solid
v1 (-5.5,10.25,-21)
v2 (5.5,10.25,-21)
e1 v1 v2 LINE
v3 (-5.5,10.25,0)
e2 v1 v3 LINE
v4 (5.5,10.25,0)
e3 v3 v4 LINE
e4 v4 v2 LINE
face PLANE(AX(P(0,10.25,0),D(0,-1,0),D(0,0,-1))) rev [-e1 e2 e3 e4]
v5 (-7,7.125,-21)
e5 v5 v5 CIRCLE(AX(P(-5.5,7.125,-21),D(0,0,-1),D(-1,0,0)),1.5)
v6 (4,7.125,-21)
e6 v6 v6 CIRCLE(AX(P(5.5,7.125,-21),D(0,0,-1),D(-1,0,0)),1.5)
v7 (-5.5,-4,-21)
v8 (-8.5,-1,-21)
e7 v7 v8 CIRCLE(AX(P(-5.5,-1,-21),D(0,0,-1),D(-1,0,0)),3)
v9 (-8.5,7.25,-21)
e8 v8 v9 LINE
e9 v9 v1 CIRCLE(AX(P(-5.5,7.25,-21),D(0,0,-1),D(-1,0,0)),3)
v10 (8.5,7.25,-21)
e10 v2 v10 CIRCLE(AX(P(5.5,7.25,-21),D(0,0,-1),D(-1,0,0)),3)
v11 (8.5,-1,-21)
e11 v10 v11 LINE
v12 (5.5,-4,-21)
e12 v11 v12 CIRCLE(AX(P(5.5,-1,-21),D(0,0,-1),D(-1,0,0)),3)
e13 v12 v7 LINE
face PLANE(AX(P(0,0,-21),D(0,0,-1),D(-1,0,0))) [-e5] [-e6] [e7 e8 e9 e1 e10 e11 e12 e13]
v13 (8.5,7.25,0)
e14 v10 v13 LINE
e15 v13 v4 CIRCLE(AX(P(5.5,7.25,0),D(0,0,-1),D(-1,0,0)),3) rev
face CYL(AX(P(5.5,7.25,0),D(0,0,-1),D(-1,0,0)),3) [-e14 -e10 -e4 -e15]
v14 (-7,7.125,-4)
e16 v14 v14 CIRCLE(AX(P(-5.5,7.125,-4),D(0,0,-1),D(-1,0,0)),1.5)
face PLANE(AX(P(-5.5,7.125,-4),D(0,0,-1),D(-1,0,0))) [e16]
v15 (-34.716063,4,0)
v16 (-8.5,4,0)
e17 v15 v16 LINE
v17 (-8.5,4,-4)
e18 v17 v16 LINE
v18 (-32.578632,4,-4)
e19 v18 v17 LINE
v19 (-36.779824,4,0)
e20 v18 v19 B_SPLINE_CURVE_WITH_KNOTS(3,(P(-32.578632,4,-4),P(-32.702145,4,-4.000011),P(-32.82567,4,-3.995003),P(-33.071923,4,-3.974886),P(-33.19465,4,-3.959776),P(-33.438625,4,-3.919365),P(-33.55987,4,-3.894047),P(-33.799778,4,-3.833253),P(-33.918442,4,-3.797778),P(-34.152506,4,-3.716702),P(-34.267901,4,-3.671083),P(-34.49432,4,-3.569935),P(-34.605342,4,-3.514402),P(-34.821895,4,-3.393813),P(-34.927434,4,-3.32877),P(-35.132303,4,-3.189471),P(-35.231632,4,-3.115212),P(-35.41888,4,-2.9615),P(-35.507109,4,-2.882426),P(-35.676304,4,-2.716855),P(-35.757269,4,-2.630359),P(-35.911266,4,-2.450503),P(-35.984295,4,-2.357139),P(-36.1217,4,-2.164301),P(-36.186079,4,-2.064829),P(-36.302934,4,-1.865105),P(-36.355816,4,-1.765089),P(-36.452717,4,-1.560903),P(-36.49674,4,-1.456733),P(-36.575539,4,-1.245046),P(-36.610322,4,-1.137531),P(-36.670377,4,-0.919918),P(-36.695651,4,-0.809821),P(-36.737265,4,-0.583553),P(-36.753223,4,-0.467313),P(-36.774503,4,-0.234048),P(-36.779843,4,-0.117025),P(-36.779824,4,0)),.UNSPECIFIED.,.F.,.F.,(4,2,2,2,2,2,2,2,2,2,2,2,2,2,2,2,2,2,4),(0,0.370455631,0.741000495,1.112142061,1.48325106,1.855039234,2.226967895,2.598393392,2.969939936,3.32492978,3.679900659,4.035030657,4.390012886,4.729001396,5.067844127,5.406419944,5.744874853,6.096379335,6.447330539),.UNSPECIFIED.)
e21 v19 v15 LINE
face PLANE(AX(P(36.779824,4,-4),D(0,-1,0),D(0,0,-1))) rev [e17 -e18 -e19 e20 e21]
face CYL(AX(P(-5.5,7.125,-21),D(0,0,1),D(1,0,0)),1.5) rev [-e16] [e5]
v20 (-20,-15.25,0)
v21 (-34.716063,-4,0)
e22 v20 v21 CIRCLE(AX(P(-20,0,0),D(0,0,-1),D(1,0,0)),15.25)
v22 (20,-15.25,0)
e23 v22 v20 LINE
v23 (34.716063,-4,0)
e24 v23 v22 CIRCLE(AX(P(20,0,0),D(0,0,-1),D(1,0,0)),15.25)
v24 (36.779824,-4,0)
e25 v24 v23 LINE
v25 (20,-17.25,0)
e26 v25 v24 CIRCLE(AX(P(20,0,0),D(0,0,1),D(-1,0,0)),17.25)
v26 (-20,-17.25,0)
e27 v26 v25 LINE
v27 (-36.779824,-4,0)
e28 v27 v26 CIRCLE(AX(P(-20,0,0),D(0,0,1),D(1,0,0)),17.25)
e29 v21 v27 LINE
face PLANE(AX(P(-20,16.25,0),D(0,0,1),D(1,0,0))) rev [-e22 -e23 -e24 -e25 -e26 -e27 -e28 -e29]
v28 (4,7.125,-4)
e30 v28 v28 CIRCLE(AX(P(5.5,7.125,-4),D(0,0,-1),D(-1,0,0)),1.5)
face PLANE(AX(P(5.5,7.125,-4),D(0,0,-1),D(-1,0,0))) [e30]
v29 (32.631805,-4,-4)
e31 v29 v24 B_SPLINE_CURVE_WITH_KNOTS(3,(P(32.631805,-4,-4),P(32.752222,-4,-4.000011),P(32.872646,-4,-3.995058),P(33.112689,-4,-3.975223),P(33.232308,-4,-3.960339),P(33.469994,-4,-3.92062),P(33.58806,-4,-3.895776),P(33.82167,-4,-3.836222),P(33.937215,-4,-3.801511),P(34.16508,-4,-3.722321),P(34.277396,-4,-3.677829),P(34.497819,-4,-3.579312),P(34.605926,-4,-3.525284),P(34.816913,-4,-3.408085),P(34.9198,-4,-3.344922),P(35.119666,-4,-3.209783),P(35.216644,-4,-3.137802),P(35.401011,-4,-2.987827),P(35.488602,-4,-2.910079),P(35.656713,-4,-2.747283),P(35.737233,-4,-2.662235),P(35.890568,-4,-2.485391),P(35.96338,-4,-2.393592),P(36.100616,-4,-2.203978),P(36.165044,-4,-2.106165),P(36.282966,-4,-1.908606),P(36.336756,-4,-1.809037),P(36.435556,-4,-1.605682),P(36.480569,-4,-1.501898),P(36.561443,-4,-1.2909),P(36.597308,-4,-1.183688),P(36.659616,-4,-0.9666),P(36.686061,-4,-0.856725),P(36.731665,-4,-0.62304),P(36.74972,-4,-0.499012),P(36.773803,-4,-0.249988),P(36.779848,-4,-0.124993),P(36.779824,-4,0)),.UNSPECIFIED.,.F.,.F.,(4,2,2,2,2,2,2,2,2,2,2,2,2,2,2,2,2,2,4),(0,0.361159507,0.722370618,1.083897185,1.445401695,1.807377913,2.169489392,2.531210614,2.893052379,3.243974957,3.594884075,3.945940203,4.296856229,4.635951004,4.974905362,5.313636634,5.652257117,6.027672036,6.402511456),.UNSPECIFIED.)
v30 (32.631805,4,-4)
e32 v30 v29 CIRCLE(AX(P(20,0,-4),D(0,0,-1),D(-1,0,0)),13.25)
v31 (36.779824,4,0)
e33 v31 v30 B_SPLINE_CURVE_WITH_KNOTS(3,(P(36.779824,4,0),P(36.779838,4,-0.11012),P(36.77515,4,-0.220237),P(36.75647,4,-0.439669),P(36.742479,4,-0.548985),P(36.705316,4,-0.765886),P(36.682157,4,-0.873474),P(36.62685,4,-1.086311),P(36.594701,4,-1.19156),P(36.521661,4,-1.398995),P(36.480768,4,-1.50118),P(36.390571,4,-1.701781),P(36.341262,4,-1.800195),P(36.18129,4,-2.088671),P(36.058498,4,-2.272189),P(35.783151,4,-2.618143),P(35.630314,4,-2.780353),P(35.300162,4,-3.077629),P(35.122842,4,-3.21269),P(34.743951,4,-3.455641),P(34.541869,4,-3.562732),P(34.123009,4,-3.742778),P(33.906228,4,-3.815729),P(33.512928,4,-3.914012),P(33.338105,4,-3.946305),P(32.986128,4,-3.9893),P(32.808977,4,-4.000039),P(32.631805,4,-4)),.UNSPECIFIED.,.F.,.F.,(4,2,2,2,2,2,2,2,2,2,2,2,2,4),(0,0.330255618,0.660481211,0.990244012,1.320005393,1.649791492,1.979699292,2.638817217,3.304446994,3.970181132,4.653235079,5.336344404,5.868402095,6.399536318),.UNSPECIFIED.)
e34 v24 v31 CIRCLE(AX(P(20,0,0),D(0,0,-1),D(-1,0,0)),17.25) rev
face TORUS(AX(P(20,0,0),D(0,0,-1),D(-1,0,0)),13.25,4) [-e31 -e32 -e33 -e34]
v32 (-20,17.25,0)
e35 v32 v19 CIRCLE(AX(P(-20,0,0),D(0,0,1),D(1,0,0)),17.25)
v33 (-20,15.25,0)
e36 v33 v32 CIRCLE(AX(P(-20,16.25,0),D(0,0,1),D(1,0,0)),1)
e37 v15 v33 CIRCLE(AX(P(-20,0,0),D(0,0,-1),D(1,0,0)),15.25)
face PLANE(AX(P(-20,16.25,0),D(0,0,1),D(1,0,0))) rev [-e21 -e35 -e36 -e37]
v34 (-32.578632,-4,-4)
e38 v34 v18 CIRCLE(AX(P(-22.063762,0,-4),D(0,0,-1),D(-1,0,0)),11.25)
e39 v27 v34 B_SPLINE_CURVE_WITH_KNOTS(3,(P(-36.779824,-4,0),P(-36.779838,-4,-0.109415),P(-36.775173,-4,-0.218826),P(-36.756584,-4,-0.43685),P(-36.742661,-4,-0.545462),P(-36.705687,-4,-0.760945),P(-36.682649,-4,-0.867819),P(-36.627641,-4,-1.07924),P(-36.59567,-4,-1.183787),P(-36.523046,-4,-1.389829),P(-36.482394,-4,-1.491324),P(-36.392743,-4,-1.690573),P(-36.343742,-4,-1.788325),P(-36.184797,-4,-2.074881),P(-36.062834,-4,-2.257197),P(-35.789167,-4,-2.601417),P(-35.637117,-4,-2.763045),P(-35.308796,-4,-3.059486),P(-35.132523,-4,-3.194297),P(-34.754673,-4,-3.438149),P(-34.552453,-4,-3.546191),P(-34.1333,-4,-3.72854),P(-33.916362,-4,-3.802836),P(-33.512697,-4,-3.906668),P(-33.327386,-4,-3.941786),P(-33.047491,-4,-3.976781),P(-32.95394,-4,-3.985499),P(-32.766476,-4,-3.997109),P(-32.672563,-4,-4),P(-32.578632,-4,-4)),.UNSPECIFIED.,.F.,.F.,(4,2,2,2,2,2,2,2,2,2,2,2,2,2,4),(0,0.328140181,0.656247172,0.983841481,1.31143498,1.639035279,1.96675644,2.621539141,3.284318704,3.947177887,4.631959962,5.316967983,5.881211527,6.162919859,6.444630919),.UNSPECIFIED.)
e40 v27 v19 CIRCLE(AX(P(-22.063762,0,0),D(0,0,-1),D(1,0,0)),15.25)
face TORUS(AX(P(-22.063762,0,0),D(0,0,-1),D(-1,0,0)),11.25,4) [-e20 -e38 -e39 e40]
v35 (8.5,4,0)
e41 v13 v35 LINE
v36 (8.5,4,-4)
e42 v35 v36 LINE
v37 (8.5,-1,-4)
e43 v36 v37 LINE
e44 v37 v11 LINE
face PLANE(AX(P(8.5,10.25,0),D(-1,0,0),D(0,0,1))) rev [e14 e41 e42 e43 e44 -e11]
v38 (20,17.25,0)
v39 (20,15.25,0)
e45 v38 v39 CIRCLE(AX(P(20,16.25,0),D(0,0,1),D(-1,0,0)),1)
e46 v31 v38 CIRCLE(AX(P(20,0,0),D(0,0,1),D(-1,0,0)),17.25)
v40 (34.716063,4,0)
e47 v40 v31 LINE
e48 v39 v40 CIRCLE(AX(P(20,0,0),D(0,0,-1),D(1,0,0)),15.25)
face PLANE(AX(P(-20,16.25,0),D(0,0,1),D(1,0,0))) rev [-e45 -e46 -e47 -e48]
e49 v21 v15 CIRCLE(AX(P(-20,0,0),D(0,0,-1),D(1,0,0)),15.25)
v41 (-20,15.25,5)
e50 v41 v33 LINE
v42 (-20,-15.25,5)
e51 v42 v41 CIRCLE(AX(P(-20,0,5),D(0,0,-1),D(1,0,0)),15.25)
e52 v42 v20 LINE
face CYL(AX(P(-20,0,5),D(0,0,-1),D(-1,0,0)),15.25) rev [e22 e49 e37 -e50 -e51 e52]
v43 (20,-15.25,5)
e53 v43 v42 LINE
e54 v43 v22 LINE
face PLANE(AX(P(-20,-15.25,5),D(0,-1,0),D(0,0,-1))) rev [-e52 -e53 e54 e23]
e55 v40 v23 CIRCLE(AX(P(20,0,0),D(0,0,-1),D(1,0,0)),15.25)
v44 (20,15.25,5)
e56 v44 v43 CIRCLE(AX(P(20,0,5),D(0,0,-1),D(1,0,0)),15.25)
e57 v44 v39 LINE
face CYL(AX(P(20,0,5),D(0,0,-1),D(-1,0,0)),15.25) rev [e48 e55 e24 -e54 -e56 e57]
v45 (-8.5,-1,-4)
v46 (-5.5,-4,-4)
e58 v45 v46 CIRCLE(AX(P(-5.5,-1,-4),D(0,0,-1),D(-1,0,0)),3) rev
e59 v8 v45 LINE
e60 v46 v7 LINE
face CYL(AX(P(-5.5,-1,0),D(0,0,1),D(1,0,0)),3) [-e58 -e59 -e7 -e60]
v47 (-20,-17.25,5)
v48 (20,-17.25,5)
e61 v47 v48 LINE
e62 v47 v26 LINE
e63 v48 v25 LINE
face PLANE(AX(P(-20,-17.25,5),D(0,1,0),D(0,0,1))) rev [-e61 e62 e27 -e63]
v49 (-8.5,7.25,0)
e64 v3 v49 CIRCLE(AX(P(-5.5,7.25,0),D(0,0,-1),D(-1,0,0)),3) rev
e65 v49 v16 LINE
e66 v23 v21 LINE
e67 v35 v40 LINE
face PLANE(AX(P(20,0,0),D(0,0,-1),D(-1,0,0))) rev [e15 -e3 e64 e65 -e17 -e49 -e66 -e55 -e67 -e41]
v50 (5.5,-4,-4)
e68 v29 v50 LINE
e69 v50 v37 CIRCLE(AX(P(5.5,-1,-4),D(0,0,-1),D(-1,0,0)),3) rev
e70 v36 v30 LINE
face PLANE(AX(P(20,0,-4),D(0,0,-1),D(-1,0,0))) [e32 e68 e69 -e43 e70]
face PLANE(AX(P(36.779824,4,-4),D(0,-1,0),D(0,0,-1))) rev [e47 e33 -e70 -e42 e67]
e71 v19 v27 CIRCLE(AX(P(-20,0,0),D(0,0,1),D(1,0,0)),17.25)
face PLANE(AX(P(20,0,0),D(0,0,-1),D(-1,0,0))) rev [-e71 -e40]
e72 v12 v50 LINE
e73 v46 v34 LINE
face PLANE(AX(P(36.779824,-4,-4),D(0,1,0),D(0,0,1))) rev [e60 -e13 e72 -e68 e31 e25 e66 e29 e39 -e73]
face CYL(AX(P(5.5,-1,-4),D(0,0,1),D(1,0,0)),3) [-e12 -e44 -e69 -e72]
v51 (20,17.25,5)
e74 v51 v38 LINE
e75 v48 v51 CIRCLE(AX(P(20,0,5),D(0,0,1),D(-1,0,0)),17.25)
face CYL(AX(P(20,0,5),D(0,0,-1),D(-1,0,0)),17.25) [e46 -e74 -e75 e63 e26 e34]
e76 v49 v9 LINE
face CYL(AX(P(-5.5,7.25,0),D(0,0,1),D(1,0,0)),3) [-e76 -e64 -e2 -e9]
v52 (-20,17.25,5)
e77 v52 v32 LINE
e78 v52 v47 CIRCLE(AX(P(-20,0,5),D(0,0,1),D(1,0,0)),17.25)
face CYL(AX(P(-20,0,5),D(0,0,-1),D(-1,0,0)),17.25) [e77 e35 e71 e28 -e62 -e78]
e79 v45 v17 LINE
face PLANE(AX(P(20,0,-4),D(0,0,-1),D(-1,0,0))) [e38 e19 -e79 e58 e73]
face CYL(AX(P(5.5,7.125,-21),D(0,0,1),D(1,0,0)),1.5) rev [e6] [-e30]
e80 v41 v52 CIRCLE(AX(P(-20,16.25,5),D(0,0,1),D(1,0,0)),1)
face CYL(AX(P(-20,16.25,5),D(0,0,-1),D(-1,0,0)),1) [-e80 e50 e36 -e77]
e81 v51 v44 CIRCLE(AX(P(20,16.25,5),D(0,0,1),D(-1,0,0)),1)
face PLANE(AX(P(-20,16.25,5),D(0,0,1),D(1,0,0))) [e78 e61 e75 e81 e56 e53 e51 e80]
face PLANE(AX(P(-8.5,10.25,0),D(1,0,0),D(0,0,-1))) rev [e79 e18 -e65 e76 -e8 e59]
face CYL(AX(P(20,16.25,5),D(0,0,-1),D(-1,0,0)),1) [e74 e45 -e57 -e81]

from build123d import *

# Parameters (mm, degrees)
BOSS_EXTRUDE1_DEPTH = 5
BOSS_EXTRUDE2_START = 4
BOSS_EXTRUDE2_DEPTH = 4
FILLET1_R           = 4
SKETCH5_W           = 17
SKETCH5_H           = 4
BOSS_EXTRUDE3_DEPTH = 6.25
SKETCH8_W           = 17
SKETCH8_H           = 14.25
BOSS_EXTRUDE4_DEPTH = 17
SKETCH6_R           = 1.5
CUT_EXTRUDE1_DEPTH  = 45.484596337
FILLET3_R           = 3


with BuildPart() as part:
    # Sketch3 → Boss-Extrude1 (new body)
    with BuildSketch(Plane.XY):
        with BuildLine():
            Line((-20, -17.25), (20, -17.25))
            ThreePointArc((20, -17.25), (37.25, 0), (20, 17.25))
            ThreePointArc((20, 17.25), (19, 16.25), (20, 15.25))
            ThreePointArc((20, 15.25), (35.25, 0), (20, -15.25))
            Line((20, -15.25), (-20, -15.25))
            ThreePointArc((-20, -15.25), (-35.25, 0), (-20, 15.25))
            ThreePointArc((-20, 15.25), (-19, 16.25), (-20, 17.25))
            ThreePointArc((-20, 17.25), (-37.25, 0), (-20, -17.25))
        make_face()
    extrude(amount=BOSS_EXTRUDE1_DEPTH)

    # Sketch4 → Boss-Extrude2 (add)
    with BuildSketch(Plane(origin=(0, 0, 0), x_dir=(-1, 0, 0), z_dir=(0, 0, -1)).offset(BOSS_EXTRUDE2_START)):
        with BuildLine():
            Line((-36.779824195, 4), (36.779824195, 4))
            ThreePointArc((36.779824195, 4), (37.313761542, 0), (36.779824195, -4))
            Line((36.779824195, -4), (-36.779824195, -4))
            ThreePointArc((-36.779824195, -4), (-37.25, 0), (-36.779824195, 4))
        make_face()
    extrude(amount=-BOSS_EXTRUDE2_DEPTH)

    # Fillet1
    fillet1_edges = [part.edges().sort_by_distance(p)[0] for p in [
        (-37.313761542, 0, -4),
        (37.25, 0, -4),
    ]]
    fillet(fillet1_edges, radius=FILLET1_R - 0.0001)  # a hair under: the kernel refuses the full size

    # Sketch5 → Boss-Extrude3 (add)
    with BuildSketch(Plane(origin=(0, 4, 0), x_dir=(1, 0, 0), z_dir=(0, 1, 0))):
        with Locations((0, 2)):
            Rectangle(SKETCH5_W, SKETCH5_H)
    extrude(amount=BOSS_EXTRUDE3_DEPTH)

    # Sketch8 → Boss-Extrude4 (add)
    with BuildSketch(Plane(origin=(0, 0, -4), x_dir=(-1, 0, 0), z_dir=(0, 0, -1))):
        with Locations((0, 3.125)):
            Rectangle(SKETCH8_W, SKETCH8_H)
    extrude(amount=BOSS_EXTRUDE4_DEPTH)

    # Sketch6 → Cut-Extrude1 (cut, through all)
    with BuildSketch(Plane(origin=(0, 0, -4), x_dir=(-1, 0, 0), z_dir=(0, 0, -1))):
        with Locations((-5.5, 7.125)):
            Circle(SKETCH6_R)
        with Locations((5.5, 7.125)):
            Circle(SKETCH6_R)
    extrude(amount=CUT_EXTRUDE1_DEPTH, mode=Mode.SUBTRACT)

    # Fillet3
    fillet3_edges = [part.edges().sort_by_distance(p)[0] for p in [
        (-8.5, 10.25, -10.5),
        (8.5, 10.25, -10.5),
        (8.5, -4, -12.5),
        (-8.5, -4, -12.5),
    ]]
    fillet(fillet3_edges, radius=FILLET3_R)


solid = part.part
